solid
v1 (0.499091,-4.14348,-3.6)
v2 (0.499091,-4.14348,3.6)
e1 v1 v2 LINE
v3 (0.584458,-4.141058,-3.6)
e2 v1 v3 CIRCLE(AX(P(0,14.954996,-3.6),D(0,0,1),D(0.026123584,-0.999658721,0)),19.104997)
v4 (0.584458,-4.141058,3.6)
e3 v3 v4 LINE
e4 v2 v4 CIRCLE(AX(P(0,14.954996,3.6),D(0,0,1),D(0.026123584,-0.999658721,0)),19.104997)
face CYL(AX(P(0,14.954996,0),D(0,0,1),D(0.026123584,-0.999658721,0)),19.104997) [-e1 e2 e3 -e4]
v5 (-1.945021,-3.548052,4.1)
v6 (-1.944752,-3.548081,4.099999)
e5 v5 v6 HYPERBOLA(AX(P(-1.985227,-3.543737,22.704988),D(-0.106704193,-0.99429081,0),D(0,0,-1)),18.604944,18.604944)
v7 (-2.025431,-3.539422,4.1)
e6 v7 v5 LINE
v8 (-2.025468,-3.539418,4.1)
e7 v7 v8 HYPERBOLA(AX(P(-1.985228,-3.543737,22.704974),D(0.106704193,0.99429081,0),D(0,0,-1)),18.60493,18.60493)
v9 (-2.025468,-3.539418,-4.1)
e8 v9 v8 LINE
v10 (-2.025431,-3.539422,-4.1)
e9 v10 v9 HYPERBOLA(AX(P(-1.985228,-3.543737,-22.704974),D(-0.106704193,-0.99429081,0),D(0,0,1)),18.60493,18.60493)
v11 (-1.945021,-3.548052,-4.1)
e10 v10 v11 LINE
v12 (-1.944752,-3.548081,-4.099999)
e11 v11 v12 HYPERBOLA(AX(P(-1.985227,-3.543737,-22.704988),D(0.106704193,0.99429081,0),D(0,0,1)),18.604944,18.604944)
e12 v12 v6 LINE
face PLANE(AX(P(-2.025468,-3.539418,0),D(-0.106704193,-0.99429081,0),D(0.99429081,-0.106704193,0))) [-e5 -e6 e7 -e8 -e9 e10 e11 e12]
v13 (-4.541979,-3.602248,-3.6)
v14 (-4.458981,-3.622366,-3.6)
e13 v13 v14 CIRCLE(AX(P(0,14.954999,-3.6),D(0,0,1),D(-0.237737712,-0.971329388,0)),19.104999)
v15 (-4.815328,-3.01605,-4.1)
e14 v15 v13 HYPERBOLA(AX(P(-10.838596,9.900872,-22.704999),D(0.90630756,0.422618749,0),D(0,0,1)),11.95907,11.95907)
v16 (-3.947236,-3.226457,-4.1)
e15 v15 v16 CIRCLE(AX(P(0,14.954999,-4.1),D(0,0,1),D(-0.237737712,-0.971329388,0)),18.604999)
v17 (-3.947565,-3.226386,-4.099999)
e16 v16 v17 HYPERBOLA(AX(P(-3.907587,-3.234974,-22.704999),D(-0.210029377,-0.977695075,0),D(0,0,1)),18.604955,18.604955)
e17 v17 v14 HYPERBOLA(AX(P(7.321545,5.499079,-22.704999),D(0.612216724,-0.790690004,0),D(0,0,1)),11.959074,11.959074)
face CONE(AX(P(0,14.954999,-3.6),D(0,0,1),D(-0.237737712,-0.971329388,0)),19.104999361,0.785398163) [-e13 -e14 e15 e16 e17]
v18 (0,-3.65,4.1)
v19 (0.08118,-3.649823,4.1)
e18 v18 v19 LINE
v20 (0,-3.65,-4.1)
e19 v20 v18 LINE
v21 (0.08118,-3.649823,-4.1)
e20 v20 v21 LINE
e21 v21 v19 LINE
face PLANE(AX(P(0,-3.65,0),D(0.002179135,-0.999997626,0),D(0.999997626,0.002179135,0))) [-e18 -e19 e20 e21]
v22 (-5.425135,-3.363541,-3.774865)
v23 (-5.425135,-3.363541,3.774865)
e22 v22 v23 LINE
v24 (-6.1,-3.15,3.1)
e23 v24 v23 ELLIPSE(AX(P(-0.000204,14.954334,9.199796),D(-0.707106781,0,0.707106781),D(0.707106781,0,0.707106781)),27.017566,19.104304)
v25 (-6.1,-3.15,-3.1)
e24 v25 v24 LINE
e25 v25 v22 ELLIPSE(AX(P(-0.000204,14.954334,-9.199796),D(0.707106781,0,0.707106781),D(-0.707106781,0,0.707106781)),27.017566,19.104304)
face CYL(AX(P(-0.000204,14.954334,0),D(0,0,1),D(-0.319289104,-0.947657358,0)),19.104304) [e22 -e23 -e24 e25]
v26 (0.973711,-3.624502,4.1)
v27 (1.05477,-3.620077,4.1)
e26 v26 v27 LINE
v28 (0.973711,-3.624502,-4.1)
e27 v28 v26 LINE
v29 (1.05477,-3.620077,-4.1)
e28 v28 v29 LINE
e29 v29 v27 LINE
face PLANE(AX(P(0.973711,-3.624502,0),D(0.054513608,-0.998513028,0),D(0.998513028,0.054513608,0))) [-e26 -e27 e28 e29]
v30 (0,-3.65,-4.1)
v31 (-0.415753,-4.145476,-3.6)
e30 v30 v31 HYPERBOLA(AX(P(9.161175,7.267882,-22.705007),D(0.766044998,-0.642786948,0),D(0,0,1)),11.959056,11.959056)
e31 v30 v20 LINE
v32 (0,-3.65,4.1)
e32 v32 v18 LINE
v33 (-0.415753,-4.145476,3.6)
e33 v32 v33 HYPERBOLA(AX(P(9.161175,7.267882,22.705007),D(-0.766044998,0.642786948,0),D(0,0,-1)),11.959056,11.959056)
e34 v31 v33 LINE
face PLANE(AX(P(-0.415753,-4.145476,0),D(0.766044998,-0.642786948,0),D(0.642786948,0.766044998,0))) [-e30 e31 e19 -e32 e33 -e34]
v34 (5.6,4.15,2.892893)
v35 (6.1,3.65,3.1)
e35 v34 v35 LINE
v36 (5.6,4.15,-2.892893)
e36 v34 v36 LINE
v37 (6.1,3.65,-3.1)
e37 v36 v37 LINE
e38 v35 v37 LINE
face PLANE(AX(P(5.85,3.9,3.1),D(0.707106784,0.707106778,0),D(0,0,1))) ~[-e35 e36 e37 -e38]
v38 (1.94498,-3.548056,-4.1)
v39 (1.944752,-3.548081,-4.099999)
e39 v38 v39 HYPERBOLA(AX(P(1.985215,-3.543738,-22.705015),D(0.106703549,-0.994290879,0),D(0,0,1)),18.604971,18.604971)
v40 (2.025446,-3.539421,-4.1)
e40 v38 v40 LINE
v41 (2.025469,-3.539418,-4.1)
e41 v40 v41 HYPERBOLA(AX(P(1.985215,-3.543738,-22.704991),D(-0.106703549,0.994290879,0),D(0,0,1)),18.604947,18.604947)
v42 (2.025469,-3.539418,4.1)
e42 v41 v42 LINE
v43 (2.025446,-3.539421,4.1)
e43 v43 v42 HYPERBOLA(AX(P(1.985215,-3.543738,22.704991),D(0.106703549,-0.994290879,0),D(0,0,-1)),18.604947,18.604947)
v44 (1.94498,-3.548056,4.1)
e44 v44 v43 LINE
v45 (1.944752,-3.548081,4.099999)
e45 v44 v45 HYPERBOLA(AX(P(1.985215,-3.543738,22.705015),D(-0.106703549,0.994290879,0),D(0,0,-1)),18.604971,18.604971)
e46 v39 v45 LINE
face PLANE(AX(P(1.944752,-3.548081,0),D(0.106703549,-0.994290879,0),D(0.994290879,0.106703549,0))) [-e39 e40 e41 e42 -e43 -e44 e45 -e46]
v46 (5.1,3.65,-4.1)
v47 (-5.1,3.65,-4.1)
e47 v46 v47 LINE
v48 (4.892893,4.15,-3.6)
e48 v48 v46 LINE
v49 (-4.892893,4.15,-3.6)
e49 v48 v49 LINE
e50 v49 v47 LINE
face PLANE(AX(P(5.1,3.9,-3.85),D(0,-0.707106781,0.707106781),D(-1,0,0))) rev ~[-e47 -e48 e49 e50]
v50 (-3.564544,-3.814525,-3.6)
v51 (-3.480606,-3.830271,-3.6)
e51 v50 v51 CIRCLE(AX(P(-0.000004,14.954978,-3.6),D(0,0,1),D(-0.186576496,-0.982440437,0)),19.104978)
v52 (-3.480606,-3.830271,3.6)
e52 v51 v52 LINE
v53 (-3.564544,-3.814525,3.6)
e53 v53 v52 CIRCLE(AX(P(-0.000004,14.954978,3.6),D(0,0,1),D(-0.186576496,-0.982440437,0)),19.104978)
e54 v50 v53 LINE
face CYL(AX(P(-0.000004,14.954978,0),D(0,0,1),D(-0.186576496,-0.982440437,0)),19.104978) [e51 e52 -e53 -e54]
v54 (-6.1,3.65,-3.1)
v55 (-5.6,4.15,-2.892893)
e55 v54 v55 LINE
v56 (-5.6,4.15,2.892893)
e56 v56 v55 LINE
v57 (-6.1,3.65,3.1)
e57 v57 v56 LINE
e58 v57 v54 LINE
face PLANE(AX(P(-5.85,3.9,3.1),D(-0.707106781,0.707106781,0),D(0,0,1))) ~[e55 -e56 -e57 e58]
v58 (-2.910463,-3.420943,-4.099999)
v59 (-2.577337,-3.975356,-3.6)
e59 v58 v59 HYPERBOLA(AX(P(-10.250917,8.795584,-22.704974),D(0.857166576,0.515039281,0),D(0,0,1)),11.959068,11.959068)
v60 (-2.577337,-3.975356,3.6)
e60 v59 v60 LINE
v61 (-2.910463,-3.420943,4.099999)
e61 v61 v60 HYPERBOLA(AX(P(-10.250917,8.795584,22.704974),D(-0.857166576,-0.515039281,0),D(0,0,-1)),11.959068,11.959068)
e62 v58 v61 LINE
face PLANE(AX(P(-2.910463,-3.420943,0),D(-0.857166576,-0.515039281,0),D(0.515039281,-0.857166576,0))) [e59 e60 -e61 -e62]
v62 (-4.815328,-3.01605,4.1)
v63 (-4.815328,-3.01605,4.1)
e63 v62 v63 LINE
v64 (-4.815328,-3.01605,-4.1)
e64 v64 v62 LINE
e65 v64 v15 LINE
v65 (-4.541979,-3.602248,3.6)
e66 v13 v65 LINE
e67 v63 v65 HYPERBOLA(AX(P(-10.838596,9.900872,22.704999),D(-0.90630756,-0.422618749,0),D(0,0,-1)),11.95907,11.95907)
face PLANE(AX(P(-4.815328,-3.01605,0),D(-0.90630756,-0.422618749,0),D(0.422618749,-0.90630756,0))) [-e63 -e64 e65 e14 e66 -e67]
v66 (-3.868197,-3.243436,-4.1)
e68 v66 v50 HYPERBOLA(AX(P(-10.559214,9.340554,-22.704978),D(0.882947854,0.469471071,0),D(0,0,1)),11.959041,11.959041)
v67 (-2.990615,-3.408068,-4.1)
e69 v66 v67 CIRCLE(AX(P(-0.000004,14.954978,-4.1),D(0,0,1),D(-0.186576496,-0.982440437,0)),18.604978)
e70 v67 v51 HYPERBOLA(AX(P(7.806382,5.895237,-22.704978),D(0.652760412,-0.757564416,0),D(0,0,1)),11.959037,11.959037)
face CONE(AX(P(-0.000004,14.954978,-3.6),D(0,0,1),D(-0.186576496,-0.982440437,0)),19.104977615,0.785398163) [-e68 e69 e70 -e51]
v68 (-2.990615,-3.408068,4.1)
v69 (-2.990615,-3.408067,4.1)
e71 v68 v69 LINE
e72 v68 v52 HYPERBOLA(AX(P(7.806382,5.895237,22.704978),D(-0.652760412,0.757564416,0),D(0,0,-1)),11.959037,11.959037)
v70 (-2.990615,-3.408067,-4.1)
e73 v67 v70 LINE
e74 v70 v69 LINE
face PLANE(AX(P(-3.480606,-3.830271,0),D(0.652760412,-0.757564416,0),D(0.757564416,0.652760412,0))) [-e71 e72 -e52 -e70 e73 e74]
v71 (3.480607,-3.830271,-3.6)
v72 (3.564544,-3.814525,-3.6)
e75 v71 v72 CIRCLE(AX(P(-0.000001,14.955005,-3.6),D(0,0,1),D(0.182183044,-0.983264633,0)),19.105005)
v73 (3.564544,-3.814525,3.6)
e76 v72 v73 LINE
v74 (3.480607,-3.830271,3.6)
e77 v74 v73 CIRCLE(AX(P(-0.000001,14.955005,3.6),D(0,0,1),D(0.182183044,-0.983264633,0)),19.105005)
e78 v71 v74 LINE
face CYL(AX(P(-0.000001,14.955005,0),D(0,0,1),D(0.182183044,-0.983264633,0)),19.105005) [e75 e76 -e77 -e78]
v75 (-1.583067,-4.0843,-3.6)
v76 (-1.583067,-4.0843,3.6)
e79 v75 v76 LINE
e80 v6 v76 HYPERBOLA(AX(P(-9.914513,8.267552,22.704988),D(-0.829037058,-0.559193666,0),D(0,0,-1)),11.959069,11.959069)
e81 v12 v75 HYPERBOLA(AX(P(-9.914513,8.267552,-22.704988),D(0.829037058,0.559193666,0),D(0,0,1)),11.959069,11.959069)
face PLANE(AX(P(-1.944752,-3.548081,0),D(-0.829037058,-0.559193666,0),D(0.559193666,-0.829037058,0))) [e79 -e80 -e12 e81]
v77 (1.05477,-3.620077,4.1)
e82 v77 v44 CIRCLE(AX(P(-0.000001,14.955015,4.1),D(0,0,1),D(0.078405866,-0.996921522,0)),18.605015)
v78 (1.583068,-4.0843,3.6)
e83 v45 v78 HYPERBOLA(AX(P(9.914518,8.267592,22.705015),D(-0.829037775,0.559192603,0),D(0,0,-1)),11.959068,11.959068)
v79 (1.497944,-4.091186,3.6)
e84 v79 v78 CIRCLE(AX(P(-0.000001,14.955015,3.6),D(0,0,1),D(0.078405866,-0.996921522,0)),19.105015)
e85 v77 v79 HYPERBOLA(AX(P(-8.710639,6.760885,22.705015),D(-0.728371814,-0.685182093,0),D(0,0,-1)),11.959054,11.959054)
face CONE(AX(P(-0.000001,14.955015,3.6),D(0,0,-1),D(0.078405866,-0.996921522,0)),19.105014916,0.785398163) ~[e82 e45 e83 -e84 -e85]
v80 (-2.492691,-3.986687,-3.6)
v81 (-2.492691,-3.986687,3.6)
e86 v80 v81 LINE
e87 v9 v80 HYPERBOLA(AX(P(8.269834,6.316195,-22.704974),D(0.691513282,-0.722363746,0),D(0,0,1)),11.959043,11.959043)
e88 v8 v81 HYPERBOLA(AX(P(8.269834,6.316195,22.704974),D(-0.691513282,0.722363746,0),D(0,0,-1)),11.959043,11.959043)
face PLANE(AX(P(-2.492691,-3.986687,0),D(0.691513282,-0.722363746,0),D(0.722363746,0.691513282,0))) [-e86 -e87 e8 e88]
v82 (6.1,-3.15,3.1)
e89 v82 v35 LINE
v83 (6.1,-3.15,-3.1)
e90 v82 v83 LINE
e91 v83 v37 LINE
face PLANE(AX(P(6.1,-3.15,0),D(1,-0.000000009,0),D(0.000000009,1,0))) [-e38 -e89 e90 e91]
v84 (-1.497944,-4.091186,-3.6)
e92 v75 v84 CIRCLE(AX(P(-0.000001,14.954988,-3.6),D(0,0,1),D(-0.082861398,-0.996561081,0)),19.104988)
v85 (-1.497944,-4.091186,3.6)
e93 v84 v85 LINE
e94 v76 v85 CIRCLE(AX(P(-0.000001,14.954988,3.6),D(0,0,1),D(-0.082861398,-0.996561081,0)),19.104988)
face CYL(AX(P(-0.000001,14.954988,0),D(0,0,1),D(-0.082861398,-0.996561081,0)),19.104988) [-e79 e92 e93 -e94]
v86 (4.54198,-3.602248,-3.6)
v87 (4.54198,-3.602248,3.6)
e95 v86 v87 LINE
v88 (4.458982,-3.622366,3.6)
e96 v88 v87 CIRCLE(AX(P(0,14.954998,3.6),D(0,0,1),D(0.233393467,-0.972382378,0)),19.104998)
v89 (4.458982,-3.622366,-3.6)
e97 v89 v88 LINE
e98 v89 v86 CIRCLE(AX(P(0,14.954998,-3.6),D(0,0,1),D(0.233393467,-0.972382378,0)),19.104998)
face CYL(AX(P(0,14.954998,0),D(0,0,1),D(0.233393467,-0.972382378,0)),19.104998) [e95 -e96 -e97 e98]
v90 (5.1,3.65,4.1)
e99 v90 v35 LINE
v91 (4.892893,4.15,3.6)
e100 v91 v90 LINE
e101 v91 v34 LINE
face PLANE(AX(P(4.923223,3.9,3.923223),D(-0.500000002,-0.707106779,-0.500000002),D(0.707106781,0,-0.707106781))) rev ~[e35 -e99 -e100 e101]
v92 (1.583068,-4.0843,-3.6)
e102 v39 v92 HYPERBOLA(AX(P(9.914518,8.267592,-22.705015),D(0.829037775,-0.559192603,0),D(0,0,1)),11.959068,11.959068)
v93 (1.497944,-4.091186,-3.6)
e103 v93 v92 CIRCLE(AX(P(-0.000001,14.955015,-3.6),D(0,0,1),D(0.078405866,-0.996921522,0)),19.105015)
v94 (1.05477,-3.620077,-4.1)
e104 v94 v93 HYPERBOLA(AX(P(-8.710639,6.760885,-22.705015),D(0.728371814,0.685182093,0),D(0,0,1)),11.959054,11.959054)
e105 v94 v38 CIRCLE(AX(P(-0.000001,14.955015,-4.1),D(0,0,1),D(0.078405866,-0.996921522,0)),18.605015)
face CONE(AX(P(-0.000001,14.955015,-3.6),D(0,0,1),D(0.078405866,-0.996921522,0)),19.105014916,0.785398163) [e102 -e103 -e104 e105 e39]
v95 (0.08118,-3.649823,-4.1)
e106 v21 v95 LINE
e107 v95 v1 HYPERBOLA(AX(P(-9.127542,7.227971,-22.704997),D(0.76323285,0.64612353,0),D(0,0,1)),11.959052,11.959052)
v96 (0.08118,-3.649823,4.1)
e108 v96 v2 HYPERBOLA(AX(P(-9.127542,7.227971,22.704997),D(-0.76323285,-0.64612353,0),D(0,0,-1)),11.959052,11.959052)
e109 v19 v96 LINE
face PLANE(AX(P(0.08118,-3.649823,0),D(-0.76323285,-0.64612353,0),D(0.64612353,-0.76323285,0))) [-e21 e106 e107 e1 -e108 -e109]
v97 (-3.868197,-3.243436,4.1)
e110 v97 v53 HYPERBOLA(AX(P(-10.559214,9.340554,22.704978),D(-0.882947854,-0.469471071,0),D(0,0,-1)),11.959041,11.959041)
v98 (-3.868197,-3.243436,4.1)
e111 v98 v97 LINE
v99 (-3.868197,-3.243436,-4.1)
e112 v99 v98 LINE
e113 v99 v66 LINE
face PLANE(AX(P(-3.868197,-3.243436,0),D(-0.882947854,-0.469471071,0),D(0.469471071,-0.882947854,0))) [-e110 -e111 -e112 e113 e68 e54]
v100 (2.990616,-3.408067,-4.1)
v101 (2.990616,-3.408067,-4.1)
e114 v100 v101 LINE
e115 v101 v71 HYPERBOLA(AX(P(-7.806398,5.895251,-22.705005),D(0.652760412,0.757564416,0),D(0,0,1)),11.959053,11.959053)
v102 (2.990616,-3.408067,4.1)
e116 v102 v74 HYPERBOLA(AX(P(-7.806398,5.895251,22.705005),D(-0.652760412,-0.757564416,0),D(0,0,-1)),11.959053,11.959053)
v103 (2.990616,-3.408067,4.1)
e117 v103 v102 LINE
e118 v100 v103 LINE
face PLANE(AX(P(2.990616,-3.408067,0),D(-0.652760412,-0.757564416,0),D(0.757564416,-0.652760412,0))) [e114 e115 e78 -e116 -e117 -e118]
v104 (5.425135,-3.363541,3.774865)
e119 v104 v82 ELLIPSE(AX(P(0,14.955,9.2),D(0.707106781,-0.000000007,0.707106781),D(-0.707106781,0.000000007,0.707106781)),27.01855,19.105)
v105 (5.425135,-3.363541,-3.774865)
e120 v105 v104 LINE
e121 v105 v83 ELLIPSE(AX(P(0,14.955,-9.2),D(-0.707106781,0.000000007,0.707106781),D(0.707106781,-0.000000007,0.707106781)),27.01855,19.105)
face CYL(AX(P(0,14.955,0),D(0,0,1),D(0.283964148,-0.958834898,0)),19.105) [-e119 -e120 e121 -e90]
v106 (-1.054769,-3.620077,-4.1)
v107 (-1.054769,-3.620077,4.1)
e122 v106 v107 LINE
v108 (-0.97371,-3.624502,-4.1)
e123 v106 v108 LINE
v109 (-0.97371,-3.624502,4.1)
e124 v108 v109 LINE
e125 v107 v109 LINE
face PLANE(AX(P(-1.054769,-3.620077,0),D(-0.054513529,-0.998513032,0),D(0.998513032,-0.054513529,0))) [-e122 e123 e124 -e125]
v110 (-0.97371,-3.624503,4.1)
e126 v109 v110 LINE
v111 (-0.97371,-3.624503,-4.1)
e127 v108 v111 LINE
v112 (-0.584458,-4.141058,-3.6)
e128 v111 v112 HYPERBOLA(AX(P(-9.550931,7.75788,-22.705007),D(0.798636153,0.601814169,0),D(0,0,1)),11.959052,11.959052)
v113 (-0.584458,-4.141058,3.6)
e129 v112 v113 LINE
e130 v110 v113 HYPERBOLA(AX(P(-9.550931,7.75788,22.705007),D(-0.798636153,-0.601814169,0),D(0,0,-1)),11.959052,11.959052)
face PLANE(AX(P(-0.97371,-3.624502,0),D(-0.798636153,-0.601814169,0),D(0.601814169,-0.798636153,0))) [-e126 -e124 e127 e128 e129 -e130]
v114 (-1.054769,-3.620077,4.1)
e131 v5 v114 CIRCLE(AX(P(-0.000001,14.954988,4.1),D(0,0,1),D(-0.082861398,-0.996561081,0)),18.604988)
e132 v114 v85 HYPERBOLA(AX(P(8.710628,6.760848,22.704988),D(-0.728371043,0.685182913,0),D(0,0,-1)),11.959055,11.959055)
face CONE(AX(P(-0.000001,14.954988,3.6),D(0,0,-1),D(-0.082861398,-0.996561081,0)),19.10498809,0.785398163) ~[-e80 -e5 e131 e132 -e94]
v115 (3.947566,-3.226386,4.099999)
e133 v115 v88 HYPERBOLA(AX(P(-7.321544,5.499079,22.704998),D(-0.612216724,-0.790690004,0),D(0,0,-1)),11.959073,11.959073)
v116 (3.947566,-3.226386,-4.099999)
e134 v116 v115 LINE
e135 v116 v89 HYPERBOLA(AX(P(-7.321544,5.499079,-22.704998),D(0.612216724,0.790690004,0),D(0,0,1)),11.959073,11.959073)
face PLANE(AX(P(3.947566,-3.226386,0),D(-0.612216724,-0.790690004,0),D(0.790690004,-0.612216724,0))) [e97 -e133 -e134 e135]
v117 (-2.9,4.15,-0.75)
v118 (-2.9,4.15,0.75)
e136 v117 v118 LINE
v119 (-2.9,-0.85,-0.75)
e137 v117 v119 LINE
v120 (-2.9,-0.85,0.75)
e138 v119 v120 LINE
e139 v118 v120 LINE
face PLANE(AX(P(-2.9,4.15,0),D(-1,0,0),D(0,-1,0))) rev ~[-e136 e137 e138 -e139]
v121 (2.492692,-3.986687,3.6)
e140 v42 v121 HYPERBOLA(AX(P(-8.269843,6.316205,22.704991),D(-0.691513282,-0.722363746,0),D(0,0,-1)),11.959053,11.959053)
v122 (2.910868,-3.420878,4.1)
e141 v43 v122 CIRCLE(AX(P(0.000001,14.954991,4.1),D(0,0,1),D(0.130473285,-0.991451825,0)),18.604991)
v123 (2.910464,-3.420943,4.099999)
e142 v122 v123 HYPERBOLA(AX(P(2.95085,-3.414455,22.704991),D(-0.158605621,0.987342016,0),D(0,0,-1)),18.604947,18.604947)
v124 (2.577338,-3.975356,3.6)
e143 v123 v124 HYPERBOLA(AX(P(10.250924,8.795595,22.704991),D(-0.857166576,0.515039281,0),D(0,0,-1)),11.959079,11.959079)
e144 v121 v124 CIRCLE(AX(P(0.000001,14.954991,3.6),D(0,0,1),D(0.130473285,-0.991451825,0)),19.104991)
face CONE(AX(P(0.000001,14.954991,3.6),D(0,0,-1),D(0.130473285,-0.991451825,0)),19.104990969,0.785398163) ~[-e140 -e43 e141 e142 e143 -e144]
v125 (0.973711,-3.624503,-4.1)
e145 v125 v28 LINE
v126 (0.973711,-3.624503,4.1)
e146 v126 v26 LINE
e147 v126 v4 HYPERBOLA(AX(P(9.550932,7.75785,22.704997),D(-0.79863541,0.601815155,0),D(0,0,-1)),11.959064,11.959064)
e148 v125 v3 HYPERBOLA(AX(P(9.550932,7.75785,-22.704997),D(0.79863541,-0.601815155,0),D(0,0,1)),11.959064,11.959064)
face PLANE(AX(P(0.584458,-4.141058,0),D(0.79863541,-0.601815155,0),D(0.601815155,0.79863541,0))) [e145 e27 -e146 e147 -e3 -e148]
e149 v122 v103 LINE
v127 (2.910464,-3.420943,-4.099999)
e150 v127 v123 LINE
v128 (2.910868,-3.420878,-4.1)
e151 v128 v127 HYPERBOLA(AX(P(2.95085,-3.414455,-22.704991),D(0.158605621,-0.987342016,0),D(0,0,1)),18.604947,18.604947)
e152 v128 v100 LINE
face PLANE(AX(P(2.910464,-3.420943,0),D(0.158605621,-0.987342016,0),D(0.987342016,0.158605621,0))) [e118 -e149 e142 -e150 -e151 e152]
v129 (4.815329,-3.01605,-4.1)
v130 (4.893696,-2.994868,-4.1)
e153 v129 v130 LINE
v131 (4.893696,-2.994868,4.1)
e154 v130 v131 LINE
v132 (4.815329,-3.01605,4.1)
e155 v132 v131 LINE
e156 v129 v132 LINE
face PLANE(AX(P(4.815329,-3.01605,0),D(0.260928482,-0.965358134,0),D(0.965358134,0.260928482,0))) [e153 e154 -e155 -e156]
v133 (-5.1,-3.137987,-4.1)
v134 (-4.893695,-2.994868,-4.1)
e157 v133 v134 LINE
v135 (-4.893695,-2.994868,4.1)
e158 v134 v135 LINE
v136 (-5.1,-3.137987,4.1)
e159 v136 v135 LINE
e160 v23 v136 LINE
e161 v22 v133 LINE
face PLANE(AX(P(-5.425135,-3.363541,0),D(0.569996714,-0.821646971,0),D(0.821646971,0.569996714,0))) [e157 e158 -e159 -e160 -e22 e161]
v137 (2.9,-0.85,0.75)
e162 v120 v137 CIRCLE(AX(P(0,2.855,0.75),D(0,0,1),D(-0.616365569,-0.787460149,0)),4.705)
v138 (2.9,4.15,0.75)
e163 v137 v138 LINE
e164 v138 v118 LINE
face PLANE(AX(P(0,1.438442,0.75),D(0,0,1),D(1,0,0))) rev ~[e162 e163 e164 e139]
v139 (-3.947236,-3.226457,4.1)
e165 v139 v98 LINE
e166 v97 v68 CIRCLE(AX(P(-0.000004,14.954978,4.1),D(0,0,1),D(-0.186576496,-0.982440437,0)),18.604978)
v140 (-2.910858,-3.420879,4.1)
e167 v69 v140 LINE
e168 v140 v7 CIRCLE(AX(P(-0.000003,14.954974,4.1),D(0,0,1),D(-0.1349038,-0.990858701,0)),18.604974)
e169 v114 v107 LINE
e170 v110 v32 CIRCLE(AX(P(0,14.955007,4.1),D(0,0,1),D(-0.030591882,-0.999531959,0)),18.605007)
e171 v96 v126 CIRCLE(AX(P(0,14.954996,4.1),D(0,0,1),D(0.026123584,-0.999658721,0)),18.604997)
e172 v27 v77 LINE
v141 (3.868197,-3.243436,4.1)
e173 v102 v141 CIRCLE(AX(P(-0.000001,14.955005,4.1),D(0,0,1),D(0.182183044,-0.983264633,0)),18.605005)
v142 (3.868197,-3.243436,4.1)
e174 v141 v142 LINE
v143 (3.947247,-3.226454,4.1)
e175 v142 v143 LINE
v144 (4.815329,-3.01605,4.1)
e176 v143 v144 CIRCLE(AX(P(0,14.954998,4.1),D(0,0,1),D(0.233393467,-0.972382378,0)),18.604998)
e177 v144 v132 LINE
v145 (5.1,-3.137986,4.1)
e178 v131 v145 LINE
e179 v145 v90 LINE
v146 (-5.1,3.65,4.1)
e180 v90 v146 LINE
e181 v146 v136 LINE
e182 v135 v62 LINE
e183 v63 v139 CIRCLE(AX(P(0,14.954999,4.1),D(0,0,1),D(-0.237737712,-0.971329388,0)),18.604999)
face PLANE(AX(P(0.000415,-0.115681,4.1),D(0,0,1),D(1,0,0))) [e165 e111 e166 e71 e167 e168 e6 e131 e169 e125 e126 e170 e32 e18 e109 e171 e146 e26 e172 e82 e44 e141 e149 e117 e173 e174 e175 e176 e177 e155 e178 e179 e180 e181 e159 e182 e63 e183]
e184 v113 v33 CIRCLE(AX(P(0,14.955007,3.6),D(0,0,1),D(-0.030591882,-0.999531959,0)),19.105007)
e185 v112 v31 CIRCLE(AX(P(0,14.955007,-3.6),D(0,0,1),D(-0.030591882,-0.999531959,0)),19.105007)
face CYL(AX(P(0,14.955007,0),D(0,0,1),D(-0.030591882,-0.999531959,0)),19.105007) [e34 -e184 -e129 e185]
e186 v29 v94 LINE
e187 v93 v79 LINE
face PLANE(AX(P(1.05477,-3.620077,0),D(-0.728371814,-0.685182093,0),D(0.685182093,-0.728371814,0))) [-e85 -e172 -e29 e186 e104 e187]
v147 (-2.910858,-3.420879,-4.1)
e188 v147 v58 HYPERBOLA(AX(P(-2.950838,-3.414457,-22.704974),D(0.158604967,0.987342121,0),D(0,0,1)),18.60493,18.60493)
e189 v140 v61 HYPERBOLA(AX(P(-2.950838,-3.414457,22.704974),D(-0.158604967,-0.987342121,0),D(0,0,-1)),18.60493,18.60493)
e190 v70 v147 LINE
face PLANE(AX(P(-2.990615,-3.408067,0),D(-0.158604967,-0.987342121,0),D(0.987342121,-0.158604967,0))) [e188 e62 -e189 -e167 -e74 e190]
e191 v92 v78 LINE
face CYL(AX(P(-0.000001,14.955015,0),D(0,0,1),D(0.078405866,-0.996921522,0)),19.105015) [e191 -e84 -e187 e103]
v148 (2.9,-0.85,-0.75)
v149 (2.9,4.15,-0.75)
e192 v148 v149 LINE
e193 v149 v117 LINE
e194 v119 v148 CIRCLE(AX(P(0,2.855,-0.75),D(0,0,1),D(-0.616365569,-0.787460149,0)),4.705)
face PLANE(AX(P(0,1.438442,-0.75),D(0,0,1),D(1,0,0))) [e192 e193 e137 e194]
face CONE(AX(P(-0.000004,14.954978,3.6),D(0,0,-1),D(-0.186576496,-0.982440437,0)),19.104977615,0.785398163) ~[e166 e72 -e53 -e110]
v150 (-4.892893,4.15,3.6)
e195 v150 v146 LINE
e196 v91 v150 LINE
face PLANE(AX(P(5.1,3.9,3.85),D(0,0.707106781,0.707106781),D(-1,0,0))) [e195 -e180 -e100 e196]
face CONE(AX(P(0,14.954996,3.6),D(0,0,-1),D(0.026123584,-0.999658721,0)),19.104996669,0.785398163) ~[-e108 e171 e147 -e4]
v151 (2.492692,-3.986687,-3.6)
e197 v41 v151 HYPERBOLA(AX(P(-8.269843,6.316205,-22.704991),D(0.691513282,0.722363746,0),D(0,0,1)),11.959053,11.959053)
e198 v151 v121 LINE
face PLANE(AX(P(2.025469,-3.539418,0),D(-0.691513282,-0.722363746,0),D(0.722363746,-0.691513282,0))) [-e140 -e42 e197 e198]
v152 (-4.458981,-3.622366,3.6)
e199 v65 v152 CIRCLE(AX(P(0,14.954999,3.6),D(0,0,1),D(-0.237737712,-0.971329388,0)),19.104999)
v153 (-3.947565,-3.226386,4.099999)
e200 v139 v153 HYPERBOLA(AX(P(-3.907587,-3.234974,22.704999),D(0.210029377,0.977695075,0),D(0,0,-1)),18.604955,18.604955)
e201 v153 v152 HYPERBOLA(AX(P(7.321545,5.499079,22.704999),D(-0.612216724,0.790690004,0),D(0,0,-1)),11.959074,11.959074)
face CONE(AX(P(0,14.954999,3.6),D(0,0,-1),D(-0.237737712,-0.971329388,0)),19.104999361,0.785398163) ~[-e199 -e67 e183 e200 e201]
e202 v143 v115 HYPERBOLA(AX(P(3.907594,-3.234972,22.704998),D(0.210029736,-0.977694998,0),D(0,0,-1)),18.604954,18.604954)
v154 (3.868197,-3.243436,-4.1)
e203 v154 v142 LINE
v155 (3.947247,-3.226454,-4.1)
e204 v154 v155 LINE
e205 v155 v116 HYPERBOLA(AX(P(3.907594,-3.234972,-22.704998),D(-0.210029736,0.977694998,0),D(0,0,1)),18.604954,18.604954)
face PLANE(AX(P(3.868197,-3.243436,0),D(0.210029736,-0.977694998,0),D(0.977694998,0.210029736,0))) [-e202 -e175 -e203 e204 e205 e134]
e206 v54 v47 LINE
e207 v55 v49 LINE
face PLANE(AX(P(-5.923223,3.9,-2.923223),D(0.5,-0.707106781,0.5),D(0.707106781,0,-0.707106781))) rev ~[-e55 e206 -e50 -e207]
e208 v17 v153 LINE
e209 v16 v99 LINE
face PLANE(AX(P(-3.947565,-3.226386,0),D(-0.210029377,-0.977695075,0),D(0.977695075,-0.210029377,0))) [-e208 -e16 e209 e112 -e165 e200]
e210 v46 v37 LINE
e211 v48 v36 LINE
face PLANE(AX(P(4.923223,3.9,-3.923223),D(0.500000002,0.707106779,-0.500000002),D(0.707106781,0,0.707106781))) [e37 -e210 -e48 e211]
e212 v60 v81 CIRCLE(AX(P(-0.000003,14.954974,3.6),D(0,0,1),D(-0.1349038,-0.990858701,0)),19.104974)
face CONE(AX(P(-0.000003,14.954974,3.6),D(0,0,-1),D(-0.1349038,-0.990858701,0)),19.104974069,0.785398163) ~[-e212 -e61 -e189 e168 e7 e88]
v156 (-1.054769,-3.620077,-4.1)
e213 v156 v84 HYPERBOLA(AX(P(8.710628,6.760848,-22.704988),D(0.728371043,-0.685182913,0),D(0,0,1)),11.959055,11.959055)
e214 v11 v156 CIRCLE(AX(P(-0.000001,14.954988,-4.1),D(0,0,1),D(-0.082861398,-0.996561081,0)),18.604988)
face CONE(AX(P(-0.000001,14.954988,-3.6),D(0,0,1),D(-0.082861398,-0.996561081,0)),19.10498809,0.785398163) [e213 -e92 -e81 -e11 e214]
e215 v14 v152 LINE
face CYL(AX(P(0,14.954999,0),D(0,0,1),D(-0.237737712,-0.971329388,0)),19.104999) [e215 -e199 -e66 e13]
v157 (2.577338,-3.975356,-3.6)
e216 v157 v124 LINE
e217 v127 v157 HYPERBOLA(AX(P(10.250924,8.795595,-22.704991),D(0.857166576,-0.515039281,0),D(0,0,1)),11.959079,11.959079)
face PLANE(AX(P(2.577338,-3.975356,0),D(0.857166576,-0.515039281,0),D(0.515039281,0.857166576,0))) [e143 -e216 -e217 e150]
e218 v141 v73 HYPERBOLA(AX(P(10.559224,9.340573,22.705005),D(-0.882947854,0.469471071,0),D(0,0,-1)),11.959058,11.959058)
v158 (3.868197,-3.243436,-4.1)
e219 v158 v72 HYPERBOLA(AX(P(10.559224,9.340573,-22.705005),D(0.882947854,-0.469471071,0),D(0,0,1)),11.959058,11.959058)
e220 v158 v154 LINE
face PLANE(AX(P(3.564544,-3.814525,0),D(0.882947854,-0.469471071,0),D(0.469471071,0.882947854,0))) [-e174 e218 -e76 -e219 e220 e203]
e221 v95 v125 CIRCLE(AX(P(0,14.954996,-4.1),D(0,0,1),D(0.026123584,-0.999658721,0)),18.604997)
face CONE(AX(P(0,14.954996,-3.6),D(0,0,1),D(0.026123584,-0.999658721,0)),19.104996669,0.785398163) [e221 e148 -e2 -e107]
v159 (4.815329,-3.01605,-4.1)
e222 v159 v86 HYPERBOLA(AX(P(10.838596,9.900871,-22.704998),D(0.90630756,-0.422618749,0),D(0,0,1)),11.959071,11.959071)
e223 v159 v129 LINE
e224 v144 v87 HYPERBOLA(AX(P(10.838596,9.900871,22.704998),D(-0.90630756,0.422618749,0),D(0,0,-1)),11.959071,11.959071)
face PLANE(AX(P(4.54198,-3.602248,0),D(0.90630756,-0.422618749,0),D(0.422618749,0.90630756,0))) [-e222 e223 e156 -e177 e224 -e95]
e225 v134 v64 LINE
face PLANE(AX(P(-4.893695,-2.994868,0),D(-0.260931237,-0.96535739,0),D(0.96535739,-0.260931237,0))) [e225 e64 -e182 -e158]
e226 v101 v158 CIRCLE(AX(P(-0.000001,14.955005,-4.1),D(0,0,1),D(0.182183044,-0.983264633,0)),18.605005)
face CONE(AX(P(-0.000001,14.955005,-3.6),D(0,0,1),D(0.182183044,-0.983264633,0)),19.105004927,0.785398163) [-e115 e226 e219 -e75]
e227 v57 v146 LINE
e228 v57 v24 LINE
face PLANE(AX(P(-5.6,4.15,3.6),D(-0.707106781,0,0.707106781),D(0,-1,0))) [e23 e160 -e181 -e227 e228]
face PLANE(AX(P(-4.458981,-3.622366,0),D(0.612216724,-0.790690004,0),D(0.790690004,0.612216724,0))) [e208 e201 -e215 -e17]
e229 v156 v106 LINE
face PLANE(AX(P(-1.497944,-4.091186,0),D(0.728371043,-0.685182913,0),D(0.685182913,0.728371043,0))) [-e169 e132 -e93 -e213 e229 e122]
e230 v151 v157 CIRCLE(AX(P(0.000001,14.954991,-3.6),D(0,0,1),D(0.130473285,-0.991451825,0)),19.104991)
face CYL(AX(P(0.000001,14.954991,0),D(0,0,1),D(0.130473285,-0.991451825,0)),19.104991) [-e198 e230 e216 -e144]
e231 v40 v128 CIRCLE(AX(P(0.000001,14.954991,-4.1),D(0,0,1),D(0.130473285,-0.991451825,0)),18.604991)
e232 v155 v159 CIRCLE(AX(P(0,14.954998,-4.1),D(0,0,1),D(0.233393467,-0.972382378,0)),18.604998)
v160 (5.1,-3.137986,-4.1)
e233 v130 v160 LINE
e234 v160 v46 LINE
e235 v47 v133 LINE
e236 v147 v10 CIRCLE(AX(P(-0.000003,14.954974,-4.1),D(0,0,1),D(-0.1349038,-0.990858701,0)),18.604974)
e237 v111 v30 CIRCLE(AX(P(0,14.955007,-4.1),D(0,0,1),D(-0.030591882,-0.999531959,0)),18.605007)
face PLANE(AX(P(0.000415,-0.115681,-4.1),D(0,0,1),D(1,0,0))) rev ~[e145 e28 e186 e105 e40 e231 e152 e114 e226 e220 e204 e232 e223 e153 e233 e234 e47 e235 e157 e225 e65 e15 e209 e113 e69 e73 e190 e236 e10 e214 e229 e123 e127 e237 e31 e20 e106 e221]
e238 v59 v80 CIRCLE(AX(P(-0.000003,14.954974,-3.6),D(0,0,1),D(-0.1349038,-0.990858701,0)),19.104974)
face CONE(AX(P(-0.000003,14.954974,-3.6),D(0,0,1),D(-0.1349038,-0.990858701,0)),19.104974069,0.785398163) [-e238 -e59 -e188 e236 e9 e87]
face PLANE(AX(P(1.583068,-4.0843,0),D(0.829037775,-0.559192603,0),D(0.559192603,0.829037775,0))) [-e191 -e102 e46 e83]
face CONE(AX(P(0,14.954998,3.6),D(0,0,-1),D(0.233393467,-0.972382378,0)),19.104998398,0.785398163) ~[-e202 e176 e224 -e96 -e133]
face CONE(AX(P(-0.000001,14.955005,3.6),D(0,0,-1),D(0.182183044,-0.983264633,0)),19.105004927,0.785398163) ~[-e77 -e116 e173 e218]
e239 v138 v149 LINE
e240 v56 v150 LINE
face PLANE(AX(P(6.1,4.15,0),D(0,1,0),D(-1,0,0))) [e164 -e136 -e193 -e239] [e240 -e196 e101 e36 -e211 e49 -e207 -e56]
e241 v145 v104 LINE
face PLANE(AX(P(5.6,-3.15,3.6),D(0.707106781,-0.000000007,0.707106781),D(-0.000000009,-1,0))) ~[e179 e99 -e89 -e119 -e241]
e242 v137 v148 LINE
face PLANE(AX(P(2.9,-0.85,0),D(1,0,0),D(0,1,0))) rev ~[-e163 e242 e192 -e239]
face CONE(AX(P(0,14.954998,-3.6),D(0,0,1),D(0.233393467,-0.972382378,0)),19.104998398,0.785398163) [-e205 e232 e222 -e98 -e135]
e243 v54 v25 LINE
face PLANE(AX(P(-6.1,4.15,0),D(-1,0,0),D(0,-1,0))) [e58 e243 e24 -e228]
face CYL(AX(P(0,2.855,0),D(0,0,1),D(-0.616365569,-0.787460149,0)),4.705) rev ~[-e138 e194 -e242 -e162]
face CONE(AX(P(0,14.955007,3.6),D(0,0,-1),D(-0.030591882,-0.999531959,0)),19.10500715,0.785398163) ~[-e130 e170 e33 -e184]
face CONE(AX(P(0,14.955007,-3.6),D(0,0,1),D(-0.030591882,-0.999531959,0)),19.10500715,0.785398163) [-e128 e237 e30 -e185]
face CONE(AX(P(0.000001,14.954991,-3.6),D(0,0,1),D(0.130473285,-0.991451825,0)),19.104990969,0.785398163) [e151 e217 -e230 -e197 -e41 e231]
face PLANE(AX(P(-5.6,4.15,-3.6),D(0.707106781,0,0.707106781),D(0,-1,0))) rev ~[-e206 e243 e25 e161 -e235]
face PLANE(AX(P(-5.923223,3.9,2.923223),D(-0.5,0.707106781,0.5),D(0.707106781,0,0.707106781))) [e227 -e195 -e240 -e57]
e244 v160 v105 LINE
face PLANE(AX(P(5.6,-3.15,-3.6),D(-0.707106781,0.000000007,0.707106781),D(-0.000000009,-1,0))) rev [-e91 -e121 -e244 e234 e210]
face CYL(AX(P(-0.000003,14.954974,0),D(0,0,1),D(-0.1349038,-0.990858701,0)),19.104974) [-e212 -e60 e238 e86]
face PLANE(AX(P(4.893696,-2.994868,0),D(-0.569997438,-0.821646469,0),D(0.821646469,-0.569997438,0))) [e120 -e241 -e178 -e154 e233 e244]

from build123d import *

# Parameters (mm, degrees)
F1_DEPTH = 4.1
F3_DEPTH = 0.75
F4_SIZE  = 1
F5_SIZE  = 0.5
F6_SIZE  = 0.5


# Not quite as in the source:
# - ends of sketch curves that miss each other by under 0.0002 mm in the source are joined


with BuildPart() as f1:
    # F0 (on Top) → F1 (new body, symmetric)
    with BuildSketch(Plane.XY):
        with BuildLine():
            Line((-6.1, 4.15), (-6.1, -3.15))
            ThreePointArc((-6.1, -3.15), (-5.7635565841, -3.2598963663), (-5.425135, -3.363541))
            Line((-5.425135, -3.363541), (-4.893695, -2.994868))
            Line((-4.893695, -2.994868), (-4.8153280581, -3.0160501894))
            Line((-4.8153280581, -3.0160501894), (-4.5419790581, -3.6022481894))
            ThreePointArc((-4.5419790581, -3.6022481894), (-4.5004913685, -3.6123533808), (-4.4589811968, -3.62236582))
            Line((-4.4589811968, -3.62236582), (-3.9475651968, -3.22638582))
            Line((-3.9475651968, -3.22638582), (-3.8681969582, -3.2434357798))
            Line((-3.8681969582, -3.2434357798), (-3.5645439582, -3.8145247798))
            ThreePointArc((-3.5645439582, -3.8145247798), (-3.5225838002, -3.822444913), (-3.4806060449, -3.8302712423))
            Line((-3.4806060449, -3.8302712423), (-2.9906150449, -3.4080672423))
            Line((-2.9906150449, -3.4080672423), (-2.9104630974, -3.4209427155))
            Line((-2.9104630974, -3.4209427155), (-2.5773370974, -3.9753557155))
            ThreePointArc((-2.5773370974, -3.9753557155), (-2.5350204133, -3.9810689039), (-2.4926910656, -3.9866874981))
            Line((-2.4926910656, -3.9866874981), (-2.0254680656, -3.5394184981))
            Line((-2.0254680656, -3.5394184981), (-1.9447520573, -3.5480806887))
            Line((-1.9447520573, -3.5480806887), (-1.5830670573, -4.0842996887))
            ThreePointArc((-1.5830670573, -4.0842996887), (-1.5405093729, -4.0877903631), (-1.4979439929, -4.0911859103))
            Line((-1.4979439929, -4.0911859103), (-1.0547689929, -3.6200769103))
            Line((-1.0547689929, -3.6200769103), (-0.9737100092, -3.624502302))
            Line((-0.9737100092, -3.624502302), (-0.5844580092, -4.141058302))
            ThreePointArc((-0.5844580092, -4.141058302), (-0.5001103826, -4.1434534303), (-0.415753, -4.1454759956))
            Line((-0.415753, -4.1454759956), (0, -3.6499999956))
            Line((0, -3.6499999956), (0.0811800024, -3.649823093))
            Line((0.0811800024, -3.649823093), (0.4990910024, -4.143480093))
            ThreePointArc((0.4990910024, -4.143480093), (0.541775859, -4.1423168954), (0.5844580091, -4.1410582978))
            Line((0.5844580091, -4.1410582978), (0.9737110091, -3.6245022978))
            Line((0.9737110091, -3.6245022978), (1.0547699921, -3.6200768997))
            Line((1.0547699921, -3.6200768997), (1.4979439921, -4.0911858997))
            ThreePointArc((1.4979439921, -4.0911858997), (1.5405098686, -4.087790312), (1.5830680495, -4.084299595))
            Line((1.5830680495, -4.084299595), (1.9447520495, -3.548080595))
            Line((1.9447520495, -3.548080595), (2.0254690462, -3.5394183512))
            Line((2.0254690462, -3.5394183512), (2.4926920462, -3.9866873512))
            ThreePointArc((2.4926920462, -3.9866873512), (2.5350213933, -3.9810687545), (2.5773380767, -3.9753555637))
            Line((2.5773380767, -3.9753555637), (2.9104640767, -3.4209425637))
            Line((2.9104640767, -3.4209425637), (2.9906160072, -3.4080670388))
            Line((2.9906160072, -3.4080670388), (3.4806070072, -3.8302710388))
            ThreePointArc((3.4806070072, -3.8302710388), (3.5225842788, -3.8224447977), (3.5645439535, -3.814524755))
            Line((3.5645439535, -3.814524755), (3.8681969535, -3.243435755))
            Line((3.8681969535, -3.243435755), (3.947566135, -3.2263855622))
            Line((3.947566135, -3.2263855622), (4.458982135, -3.6223655622))
            ThreePointArc((4.458982135, -3.6223655622), (4.5004922999, -3.6123531221), (4.5419799828, -3.6022479298))
            Line((4.5419799828, -3.6022479298), (4.8153289828, -3.0160499298))
            Line((4.8153289828, -3.0160499298), (4.893695989, -2.994867963))
            Line((4.893695989, -2.994867963), (5.425134989, -3.363540963))
            ThreePointArc((5.425134989, -3.363540963), (5.7635565104, -3.2598963467), (6.0999999321, -3.1500002293))
            Line((6.0999999321, -3.1500002293), (6.1, 4.15))
            Line((6.1, 4.15), (-6.1, 4.15))
        make_face()
    extrude(amount=F1_DEPTH, both=True)

    # F2 (on Top) → F3 (cut, symmetric)
    with BuildSketch(Plane.XY):
        with BuildLine():
            Line((2.9, 4.15), (-2.9, 4.15))
            Line((-2.9, 4.15), (-2.9, -0.85))
            ThreePointArc((-2.9, -0.85), (0, -1.85), (2.9, -0.85))
            Line((2.9, -0.85), (2.9, 4.15))
        make_face()
    extrude(amount=F3_DEPTH, both=True, mode=Mode.SUBTRACT)

    # F4
    f4_edges = [f1.edges().sort_by_distance(p)[0] for p in [
        (6.1, 0.5, -4.1),
        (-6.1, 0.5, -4.1),
        (-6.1, 0.5, 4.1),
        (6.1, 0.5, 4.1),
    ]]
    chamfer(f4_edges, length=F4_SIZE)

    # F5
    f5_edges = [f1.edges().sort_by_distance(p)[0] for p in [
        (0, 4.15, -4.1),
        (-5.6, 4.15, -3.6),
        (-6.1, 4.15, 0),
        (5.6, 4.15, -3.6),
        (6.1, 4.15, 0),
        (5.6, 4.15, 3.6),
        (0, 4.15, 4.1),
        (-5.6, 4.15, 3.6),
    ]]
    chamfer(f5_edges, length=F5_SIZE)

    # F6
    f6_edges = [f1.edges().sort_by_distance(p)[0] for p in [
        (-2.53502, -3.981069, -4.1),
        (-3.522584, -3.822445, -4.1),
        (-4.500491, -3.612353, -4.1),
        (-1.540509, -4.08779, -4.1),
        (-0.50011, -4.143453, -4.1),
        (0.541776, -4.142317, -4.1),
        (1.54051, -4.08779, -4.1),
        (2.535021, -3.981069, -4.1),
        (3.522584, -3.822445, -4.1),
        (4.500492, -3.612353, -4.1),
        (-4.500491, -3.612353, 4.1),
        (-3.522584, -3.822445, 4.1),
        (-2.53502, -3.981069, 4.1),
        (-1.540509, -4.08779, 4.1),
        (-0.50011, -4.143453, 4.1),
        (0.541776, -4.142317, 4.1),
        (1.54051, -4.08779, 4.1),
        (2.535021, -3.981069, 4.1),
        (3.522584, -3.822445, 4.1),
        (4.500492, -3.612353, 4.1),
    ]]
    chamfer(f6_edges, length=F6_SIZE)


solid = f1.part
